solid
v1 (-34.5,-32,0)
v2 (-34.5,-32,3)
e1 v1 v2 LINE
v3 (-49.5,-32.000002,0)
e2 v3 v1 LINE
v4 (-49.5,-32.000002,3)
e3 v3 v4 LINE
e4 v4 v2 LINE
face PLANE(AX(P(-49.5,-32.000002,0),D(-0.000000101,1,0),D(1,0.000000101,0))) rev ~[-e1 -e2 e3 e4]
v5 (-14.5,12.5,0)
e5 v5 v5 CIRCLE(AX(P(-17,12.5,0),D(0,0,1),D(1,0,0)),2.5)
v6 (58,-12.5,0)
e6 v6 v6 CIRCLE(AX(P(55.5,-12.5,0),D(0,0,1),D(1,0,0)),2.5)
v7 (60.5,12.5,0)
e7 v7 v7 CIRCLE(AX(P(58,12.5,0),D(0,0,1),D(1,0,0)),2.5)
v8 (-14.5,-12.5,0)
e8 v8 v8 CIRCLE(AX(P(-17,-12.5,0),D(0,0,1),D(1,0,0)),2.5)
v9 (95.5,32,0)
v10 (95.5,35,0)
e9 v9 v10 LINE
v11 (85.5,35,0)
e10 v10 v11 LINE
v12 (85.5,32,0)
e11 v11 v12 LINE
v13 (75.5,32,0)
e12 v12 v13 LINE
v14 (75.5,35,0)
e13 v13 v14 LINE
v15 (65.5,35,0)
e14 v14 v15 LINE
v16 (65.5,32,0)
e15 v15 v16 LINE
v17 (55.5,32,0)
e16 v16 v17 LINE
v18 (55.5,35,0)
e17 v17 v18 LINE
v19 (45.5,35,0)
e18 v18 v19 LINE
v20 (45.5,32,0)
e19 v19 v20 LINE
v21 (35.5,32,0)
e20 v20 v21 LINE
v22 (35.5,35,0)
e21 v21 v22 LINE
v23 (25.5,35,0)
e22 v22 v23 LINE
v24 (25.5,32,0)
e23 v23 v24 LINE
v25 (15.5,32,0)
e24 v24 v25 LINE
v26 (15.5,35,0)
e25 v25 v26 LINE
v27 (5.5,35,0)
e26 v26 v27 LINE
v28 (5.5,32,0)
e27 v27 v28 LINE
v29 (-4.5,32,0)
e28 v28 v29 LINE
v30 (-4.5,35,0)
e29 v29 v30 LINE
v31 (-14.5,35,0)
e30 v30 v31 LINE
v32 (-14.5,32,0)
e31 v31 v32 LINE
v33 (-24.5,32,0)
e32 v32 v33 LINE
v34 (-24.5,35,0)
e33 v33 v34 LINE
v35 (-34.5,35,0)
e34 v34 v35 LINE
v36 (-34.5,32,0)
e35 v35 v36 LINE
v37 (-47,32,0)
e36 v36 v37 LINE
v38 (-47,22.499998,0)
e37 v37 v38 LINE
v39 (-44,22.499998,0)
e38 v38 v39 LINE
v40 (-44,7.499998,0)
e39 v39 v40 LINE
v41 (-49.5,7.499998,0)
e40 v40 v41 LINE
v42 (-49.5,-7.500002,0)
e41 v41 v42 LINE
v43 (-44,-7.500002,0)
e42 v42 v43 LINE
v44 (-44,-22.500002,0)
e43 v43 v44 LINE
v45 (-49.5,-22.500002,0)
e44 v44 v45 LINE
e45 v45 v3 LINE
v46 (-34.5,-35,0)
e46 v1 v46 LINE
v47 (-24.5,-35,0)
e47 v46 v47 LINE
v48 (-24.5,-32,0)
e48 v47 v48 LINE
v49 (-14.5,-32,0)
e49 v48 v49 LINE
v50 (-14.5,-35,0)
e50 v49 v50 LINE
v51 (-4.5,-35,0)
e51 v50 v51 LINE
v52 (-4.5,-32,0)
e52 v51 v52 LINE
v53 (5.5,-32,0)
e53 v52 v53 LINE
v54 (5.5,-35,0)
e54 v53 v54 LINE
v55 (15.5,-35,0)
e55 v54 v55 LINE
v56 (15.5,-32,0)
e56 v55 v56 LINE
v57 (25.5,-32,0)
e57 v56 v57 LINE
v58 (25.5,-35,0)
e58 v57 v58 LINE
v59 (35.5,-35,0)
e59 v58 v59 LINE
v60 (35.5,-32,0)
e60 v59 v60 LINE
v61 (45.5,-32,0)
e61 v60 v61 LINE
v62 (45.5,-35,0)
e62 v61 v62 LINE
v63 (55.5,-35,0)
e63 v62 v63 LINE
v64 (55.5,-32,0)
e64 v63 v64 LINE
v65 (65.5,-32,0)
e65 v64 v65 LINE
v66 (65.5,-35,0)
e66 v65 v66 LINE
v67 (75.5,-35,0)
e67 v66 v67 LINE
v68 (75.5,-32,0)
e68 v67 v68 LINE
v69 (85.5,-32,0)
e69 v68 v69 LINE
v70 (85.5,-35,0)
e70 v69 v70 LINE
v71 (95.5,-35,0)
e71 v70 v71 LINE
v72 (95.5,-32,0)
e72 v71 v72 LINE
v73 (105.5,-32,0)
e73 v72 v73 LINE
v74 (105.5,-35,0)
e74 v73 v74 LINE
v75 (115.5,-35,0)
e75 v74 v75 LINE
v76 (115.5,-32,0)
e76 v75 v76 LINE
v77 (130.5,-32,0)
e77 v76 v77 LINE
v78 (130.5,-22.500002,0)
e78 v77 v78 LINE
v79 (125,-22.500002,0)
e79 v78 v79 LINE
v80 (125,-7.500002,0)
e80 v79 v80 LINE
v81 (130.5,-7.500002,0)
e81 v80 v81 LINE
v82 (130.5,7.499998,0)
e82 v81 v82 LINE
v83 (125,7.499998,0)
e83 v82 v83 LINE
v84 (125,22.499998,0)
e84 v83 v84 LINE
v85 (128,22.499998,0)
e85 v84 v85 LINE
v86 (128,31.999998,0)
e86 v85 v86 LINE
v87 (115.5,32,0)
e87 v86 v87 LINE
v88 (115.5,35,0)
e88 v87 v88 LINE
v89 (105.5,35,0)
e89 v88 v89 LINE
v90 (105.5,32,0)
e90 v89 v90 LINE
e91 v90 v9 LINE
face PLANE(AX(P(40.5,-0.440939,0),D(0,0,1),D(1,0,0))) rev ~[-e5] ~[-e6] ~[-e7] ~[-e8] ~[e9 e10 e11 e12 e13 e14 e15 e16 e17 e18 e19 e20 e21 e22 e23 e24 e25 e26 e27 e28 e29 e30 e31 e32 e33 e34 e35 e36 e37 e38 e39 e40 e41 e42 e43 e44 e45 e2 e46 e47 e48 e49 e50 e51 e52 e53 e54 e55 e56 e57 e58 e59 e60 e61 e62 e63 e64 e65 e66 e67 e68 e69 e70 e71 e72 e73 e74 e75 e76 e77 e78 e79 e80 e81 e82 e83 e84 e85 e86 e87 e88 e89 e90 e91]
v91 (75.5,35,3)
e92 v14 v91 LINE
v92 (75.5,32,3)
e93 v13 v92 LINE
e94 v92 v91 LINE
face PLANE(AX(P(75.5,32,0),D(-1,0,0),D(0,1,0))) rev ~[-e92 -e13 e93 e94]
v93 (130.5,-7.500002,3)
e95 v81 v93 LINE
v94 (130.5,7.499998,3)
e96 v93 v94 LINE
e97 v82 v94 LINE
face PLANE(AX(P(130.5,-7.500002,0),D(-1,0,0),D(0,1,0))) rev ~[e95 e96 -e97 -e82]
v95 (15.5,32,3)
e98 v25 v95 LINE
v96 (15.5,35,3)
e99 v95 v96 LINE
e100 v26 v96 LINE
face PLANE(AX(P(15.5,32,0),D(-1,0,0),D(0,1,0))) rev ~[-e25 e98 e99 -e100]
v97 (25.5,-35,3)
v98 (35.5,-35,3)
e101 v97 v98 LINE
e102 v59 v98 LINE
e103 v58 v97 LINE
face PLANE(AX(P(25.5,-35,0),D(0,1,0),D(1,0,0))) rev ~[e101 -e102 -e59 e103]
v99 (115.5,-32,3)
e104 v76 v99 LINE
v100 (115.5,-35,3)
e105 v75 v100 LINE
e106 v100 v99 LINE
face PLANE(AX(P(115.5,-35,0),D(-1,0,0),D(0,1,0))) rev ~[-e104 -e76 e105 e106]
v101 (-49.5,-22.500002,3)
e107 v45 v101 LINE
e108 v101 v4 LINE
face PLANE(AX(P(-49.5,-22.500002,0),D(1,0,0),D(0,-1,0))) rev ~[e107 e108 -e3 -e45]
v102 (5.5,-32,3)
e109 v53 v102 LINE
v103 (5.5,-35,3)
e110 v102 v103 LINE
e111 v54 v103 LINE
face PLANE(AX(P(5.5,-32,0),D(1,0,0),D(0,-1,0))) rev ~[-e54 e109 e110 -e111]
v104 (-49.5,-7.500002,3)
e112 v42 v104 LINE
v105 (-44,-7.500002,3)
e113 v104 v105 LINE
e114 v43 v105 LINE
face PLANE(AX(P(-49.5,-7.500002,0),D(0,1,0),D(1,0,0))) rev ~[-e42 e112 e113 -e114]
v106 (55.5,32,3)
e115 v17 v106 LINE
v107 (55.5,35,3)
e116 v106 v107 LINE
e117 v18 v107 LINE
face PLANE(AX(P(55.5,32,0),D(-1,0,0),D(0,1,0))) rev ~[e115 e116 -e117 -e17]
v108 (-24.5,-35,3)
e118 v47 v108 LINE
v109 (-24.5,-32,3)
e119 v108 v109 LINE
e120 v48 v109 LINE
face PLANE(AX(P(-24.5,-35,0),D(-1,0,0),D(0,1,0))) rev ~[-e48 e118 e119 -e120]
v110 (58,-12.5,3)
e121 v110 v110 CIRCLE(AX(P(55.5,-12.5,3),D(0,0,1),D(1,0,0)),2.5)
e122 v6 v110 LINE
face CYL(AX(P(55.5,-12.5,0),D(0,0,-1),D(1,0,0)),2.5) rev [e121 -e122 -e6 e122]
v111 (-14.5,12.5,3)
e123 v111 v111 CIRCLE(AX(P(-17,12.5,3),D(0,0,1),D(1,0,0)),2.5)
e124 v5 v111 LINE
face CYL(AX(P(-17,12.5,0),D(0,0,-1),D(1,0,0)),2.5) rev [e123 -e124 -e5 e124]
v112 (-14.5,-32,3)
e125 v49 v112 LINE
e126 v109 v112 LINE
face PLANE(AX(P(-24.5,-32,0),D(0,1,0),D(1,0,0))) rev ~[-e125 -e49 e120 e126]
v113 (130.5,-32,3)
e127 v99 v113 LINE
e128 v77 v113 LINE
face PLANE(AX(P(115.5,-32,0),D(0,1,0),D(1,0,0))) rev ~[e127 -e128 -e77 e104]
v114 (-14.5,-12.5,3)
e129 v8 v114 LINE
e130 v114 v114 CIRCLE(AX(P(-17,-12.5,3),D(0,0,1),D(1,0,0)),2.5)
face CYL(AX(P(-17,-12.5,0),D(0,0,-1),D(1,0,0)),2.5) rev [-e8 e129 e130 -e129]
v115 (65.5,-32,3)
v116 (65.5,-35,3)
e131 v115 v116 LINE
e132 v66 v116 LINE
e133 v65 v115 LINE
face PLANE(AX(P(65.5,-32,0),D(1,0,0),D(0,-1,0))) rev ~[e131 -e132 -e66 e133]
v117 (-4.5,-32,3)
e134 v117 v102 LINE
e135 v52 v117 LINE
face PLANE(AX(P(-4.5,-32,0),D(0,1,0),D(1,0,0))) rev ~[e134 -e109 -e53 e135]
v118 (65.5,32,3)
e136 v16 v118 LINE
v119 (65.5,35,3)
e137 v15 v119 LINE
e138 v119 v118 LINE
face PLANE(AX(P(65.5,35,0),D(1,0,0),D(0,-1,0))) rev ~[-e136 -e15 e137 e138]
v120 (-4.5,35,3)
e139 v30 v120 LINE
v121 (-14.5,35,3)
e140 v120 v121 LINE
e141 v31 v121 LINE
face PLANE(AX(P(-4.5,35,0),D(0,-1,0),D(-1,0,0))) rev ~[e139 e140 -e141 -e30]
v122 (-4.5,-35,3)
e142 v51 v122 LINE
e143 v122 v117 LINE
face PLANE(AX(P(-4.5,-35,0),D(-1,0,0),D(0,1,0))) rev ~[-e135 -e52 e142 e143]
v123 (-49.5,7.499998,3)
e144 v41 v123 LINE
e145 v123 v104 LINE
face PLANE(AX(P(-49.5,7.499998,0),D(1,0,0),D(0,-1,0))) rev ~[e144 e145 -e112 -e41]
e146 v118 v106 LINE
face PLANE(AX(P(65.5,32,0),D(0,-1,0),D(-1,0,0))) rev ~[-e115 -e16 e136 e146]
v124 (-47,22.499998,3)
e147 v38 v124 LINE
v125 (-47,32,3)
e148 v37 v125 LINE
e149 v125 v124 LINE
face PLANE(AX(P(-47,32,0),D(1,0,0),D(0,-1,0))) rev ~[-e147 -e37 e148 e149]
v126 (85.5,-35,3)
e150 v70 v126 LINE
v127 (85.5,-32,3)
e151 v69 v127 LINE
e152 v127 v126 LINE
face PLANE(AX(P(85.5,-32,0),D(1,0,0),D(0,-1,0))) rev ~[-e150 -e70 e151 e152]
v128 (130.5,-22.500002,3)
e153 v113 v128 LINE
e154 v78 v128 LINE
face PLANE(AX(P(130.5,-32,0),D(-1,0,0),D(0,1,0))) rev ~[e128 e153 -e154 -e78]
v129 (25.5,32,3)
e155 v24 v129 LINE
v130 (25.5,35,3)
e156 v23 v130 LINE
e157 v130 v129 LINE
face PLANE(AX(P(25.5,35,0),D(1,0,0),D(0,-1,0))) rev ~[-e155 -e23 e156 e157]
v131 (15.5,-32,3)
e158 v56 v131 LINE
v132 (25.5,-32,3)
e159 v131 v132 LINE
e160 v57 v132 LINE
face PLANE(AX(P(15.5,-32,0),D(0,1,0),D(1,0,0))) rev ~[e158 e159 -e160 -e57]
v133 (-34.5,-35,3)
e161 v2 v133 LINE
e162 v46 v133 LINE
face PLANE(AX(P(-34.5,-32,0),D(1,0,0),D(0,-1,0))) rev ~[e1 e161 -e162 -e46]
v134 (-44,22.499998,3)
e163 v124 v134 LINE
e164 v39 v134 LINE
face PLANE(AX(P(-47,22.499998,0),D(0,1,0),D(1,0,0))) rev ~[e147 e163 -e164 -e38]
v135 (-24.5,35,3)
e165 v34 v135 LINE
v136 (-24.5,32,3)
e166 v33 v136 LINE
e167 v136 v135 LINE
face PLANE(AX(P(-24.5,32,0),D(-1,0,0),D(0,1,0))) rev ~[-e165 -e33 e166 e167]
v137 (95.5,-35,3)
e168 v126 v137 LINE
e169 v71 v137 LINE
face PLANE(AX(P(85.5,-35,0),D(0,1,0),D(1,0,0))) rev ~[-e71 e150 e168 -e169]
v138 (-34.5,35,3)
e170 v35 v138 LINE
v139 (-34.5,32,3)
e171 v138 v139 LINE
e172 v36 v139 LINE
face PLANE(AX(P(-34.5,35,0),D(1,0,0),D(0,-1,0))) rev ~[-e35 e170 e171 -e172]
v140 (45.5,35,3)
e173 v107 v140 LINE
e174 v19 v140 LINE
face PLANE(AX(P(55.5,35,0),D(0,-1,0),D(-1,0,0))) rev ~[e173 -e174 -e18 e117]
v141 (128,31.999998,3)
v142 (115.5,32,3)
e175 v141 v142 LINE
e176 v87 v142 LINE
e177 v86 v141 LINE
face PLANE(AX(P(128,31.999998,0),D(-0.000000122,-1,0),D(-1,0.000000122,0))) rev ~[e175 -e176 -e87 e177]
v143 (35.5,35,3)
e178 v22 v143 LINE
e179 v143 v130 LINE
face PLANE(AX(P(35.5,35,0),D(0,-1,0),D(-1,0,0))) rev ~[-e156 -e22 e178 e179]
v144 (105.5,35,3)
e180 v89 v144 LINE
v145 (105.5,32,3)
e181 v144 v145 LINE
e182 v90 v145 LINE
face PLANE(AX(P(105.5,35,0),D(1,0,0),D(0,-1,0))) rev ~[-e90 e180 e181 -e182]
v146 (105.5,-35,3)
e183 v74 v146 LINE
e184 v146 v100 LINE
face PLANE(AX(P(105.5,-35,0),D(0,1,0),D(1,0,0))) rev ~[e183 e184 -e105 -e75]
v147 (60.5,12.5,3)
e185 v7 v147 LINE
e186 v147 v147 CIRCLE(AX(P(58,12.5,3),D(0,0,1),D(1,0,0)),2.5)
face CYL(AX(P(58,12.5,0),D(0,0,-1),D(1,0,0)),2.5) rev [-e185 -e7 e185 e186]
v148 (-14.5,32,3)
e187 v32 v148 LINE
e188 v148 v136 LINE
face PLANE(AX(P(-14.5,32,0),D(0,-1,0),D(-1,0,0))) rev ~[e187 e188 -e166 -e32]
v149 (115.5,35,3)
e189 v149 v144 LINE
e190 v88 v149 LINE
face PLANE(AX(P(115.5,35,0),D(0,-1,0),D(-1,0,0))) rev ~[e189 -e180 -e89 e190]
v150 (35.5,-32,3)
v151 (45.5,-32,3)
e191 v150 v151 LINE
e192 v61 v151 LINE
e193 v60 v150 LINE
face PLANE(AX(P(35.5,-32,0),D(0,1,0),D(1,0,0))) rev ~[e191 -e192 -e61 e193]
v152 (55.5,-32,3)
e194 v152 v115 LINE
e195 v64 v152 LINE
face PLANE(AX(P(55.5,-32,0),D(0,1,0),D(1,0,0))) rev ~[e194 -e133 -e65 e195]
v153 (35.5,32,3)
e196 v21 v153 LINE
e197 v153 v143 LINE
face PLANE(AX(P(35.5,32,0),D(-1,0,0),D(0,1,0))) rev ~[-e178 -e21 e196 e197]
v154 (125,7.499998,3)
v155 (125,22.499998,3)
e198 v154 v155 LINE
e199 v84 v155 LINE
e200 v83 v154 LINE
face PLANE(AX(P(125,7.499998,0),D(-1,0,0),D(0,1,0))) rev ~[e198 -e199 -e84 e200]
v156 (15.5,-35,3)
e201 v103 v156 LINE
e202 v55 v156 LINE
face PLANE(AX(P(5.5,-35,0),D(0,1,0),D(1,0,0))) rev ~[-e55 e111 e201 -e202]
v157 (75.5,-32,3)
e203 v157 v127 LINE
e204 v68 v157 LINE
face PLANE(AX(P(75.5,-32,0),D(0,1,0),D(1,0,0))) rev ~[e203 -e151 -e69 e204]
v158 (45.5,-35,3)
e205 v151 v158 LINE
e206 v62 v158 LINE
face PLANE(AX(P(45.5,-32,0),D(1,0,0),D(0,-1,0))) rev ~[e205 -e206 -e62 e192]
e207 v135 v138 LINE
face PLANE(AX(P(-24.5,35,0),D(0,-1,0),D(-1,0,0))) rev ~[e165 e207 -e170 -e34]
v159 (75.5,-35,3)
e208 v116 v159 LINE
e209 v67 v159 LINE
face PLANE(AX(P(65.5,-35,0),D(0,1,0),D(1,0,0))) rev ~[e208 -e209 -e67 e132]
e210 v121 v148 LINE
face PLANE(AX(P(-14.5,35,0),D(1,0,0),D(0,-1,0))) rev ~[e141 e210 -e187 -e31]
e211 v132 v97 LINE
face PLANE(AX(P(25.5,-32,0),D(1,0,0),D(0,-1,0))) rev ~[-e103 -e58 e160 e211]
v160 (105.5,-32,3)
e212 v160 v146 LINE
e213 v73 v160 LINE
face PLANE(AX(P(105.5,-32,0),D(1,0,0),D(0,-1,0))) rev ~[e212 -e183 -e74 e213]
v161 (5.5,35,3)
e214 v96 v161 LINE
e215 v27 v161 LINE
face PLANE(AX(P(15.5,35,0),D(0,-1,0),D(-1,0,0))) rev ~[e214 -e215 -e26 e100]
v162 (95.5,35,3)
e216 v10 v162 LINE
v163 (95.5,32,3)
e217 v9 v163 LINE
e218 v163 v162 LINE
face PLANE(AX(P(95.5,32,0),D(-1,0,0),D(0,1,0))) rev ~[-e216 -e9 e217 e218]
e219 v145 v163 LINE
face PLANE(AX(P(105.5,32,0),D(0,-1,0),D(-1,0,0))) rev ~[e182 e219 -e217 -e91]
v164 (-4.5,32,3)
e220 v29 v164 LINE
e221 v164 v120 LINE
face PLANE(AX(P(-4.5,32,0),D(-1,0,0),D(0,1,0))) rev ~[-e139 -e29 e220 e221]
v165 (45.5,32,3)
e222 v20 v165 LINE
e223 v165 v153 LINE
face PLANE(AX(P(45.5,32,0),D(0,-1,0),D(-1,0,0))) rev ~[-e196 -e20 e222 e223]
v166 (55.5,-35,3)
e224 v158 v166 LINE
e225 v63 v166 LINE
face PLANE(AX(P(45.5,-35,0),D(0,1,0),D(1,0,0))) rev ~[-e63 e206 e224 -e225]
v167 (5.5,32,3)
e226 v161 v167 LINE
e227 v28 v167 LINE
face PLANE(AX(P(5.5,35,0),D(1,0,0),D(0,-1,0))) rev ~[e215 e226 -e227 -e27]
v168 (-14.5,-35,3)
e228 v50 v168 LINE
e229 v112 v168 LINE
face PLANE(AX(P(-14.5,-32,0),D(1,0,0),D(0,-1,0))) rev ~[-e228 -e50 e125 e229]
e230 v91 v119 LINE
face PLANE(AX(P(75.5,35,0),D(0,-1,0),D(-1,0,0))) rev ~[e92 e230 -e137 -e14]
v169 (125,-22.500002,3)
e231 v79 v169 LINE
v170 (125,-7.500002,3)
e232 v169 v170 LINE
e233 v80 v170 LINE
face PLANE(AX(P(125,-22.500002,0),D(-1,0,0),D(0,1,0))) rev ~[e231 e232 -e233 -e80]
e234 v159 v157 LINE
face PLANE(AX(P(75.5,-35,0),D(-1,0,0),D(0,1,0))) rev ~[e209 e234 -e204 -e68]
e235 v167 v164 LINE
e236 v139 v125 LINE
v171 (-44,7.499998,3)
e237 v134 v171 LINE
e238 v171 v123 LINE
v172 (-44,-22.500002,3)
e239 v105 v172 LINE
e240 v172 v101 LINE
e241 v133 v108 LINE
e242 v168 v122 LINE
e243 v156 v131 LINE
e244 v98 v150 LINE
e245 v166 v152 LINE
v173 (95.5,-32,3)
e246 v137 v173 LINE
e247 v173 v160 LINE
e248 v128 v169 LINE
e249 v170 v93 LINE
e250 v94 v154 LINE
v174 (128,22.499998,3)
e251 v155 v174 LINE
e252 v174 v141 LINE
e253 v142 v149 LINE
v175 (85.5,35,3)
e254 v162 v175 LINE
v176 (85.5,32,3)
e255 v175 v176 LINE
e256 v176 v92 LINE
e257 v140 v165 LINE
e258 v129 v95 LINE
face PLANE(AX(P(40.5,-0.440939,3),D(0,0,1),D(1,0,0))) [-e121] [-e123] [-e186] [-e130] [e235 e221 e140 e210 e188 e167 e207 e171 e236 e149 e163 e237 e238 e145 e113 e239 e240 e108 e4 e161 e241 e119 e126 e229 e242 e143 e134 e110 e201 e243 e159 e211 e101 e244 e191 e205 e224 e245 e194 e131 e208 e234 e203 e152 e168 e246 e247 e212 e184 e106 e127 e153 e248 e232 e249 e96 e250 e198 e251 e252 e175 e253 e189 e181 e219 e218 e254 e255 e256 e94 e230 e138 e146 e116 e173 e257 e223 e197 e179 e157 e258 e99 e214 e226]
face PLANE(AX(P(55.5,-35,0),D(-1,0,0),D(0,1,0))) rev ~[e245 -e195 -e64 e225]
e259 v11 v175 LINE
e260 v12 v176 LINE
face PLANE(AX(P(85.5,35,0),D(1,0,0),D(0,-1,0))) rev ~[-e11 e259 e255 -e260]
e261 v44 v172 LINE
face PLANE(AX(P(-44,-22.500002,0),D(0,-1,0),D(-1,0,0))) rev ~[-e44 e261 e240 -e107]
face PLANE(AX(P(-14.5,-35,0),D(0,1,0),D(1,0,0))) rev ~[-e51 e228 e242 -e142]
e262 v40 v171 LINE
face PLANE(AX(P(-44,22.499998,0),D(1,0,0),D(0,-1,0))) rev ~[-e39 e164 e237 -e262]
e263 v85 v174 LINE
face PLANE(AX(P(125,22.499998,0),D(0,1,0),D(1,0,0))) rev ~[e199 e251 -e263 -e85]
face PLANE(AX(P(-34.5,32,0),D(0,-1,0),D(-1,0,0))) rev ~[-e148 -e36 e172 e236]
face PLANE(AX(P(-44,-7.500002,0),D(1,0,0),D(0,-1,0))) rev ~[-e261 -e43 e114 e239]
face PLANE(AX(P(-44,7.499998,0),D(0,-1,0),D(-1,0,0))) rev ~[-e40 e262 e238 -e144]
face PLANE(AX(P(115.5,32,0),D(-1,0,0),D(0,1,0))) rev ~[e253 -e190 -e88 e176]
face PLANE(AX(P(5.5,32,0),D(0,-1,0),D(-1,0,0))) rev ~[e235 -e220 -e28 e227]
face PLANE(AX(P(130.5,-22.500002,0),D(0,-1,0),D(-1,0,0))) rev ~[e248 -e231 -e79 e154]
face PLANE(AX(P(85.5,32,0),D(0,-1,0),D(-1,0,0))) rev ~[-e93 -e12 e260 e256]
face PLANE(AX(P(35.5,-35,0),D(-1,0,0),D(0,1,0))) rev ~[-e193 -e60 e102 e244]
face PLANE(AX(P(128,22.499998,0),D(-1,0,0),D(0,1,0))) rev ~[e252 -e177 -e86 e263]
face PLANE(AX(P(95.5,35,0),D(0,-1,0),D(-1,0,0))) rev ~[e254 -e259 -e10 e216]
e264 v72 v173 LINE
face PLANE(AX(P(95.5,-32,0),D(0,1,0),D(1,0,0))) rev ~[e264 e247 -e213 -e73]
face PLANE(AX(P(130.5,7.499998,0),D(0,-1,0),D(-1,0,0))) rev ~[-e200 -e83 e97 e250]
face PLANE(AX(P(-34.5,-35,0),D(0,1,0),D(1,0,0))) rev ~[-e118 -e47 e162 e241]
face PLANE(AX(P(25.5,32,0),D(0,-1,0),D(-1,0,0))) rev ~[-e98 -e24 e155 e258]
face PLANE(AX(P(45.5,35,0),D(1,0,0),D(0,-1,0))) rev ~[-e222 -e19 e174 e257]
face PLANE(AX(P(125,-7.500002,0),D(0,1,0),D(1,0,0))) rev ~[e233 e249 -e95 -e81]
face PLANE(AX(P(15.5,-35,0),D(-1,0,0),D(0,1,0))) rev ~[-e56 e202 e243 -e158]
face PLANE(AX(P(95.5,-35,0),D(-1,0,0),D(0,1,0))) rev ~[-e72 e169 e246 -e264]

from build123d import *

# Parameters (mm, degrees)
F0_R     = 2.5
F1_DEPTH = 3


# Not quite as in the source:
# - ends of sketch curves that miss each other by under 0.0002 mm in the source are joined


with BuildPart() as f1:
    # F0 (on Top) → F1 (new body)
    with BuildSketch(Plane.XY):
        Polygon((-34.5, 32), (-47, 32), (-47, 22.4999984801), (-44, 22.4999984801), (-44, 7.4999984801), (-49.5, 7.4999984801), (-49.5, -7.5000015199), (-44, -7.5000015199), (-44, -22.5000015199), (-49.5, -22.5000015199), (-49.5, -32.0000015199), (-34.5, -32), (-34.5, -35), (-24.5, -35), (-24.5, -32), (-14.5, -32), (-14.5, -35), (-4.5, -35), (-4.5, -32), (5.5, -32), (5.5, -35), (15.5, -35), (15.5, -32), (25.5, -32), (25.5, -35), (35.5, -35), (35.5, -32), (40.5, -32), (45.5, -32), (45.5, -35), (55.5, -35), (55.5, -32), (65.5, -32), (65.5, -35), (75.5, -35), (75.5, -32), (85.5, -32), (85.5, -35), (95.5, -35), (95.5, -32), (105.5, -32), (105.5, -35), (115.5, -35), (115.5, -32), (130.5, -32), (130.5, -22.5000015199), (125, -22.5000015199), (125, -7.5000015199), (130.5, -7.5000015199), (130.5, 7.4999984801), (125, 7.4999984801), (125, 22.4999984801), (128, 22.4999984801), (128, 31.9999984801), (115.5, 32), (115.5, 35), (105.5, 35), (105.5, 32), (95.5, 32), (95.5, 35), (85.5, 35), (85.5, 32), (75.5, 32), (75.5, 35), (65.5, 35), (65.5, 32), (55.5, 32), (55.5, 35), (45.5, 35), (45.5, 32), (40.5, 32), (35.5, 32), (35.5, 35), (25.5, 35), (25.5, 32), (15.5, 32), (15.5, 35), (5.5, 35), (5.5, 32), (-4.5, 32), (-4.5, 35), (-14.5, 35), (-14.5, 32), (-24.5, 32), (-24.5, 35), (-34.5, 35), align=None)
        with Locations((-17, -12.5)):
            Circle(F0_R, mode=Mode.SUBTRACT)
        with Locations((55.5, -12.5)):
            Circle(F0_R, mode=Mode.SUBTRACT)
        with Locations((-17, 12.5)):
            Circle(F0_R, mode=Mode.SUBTRACT)
        with Locations((58, 12.5)):
            Circle(F0_R, mode=Mode.SUBTRACT)
    extrude(amount=F1_DEPTH)


solid = f1.part
